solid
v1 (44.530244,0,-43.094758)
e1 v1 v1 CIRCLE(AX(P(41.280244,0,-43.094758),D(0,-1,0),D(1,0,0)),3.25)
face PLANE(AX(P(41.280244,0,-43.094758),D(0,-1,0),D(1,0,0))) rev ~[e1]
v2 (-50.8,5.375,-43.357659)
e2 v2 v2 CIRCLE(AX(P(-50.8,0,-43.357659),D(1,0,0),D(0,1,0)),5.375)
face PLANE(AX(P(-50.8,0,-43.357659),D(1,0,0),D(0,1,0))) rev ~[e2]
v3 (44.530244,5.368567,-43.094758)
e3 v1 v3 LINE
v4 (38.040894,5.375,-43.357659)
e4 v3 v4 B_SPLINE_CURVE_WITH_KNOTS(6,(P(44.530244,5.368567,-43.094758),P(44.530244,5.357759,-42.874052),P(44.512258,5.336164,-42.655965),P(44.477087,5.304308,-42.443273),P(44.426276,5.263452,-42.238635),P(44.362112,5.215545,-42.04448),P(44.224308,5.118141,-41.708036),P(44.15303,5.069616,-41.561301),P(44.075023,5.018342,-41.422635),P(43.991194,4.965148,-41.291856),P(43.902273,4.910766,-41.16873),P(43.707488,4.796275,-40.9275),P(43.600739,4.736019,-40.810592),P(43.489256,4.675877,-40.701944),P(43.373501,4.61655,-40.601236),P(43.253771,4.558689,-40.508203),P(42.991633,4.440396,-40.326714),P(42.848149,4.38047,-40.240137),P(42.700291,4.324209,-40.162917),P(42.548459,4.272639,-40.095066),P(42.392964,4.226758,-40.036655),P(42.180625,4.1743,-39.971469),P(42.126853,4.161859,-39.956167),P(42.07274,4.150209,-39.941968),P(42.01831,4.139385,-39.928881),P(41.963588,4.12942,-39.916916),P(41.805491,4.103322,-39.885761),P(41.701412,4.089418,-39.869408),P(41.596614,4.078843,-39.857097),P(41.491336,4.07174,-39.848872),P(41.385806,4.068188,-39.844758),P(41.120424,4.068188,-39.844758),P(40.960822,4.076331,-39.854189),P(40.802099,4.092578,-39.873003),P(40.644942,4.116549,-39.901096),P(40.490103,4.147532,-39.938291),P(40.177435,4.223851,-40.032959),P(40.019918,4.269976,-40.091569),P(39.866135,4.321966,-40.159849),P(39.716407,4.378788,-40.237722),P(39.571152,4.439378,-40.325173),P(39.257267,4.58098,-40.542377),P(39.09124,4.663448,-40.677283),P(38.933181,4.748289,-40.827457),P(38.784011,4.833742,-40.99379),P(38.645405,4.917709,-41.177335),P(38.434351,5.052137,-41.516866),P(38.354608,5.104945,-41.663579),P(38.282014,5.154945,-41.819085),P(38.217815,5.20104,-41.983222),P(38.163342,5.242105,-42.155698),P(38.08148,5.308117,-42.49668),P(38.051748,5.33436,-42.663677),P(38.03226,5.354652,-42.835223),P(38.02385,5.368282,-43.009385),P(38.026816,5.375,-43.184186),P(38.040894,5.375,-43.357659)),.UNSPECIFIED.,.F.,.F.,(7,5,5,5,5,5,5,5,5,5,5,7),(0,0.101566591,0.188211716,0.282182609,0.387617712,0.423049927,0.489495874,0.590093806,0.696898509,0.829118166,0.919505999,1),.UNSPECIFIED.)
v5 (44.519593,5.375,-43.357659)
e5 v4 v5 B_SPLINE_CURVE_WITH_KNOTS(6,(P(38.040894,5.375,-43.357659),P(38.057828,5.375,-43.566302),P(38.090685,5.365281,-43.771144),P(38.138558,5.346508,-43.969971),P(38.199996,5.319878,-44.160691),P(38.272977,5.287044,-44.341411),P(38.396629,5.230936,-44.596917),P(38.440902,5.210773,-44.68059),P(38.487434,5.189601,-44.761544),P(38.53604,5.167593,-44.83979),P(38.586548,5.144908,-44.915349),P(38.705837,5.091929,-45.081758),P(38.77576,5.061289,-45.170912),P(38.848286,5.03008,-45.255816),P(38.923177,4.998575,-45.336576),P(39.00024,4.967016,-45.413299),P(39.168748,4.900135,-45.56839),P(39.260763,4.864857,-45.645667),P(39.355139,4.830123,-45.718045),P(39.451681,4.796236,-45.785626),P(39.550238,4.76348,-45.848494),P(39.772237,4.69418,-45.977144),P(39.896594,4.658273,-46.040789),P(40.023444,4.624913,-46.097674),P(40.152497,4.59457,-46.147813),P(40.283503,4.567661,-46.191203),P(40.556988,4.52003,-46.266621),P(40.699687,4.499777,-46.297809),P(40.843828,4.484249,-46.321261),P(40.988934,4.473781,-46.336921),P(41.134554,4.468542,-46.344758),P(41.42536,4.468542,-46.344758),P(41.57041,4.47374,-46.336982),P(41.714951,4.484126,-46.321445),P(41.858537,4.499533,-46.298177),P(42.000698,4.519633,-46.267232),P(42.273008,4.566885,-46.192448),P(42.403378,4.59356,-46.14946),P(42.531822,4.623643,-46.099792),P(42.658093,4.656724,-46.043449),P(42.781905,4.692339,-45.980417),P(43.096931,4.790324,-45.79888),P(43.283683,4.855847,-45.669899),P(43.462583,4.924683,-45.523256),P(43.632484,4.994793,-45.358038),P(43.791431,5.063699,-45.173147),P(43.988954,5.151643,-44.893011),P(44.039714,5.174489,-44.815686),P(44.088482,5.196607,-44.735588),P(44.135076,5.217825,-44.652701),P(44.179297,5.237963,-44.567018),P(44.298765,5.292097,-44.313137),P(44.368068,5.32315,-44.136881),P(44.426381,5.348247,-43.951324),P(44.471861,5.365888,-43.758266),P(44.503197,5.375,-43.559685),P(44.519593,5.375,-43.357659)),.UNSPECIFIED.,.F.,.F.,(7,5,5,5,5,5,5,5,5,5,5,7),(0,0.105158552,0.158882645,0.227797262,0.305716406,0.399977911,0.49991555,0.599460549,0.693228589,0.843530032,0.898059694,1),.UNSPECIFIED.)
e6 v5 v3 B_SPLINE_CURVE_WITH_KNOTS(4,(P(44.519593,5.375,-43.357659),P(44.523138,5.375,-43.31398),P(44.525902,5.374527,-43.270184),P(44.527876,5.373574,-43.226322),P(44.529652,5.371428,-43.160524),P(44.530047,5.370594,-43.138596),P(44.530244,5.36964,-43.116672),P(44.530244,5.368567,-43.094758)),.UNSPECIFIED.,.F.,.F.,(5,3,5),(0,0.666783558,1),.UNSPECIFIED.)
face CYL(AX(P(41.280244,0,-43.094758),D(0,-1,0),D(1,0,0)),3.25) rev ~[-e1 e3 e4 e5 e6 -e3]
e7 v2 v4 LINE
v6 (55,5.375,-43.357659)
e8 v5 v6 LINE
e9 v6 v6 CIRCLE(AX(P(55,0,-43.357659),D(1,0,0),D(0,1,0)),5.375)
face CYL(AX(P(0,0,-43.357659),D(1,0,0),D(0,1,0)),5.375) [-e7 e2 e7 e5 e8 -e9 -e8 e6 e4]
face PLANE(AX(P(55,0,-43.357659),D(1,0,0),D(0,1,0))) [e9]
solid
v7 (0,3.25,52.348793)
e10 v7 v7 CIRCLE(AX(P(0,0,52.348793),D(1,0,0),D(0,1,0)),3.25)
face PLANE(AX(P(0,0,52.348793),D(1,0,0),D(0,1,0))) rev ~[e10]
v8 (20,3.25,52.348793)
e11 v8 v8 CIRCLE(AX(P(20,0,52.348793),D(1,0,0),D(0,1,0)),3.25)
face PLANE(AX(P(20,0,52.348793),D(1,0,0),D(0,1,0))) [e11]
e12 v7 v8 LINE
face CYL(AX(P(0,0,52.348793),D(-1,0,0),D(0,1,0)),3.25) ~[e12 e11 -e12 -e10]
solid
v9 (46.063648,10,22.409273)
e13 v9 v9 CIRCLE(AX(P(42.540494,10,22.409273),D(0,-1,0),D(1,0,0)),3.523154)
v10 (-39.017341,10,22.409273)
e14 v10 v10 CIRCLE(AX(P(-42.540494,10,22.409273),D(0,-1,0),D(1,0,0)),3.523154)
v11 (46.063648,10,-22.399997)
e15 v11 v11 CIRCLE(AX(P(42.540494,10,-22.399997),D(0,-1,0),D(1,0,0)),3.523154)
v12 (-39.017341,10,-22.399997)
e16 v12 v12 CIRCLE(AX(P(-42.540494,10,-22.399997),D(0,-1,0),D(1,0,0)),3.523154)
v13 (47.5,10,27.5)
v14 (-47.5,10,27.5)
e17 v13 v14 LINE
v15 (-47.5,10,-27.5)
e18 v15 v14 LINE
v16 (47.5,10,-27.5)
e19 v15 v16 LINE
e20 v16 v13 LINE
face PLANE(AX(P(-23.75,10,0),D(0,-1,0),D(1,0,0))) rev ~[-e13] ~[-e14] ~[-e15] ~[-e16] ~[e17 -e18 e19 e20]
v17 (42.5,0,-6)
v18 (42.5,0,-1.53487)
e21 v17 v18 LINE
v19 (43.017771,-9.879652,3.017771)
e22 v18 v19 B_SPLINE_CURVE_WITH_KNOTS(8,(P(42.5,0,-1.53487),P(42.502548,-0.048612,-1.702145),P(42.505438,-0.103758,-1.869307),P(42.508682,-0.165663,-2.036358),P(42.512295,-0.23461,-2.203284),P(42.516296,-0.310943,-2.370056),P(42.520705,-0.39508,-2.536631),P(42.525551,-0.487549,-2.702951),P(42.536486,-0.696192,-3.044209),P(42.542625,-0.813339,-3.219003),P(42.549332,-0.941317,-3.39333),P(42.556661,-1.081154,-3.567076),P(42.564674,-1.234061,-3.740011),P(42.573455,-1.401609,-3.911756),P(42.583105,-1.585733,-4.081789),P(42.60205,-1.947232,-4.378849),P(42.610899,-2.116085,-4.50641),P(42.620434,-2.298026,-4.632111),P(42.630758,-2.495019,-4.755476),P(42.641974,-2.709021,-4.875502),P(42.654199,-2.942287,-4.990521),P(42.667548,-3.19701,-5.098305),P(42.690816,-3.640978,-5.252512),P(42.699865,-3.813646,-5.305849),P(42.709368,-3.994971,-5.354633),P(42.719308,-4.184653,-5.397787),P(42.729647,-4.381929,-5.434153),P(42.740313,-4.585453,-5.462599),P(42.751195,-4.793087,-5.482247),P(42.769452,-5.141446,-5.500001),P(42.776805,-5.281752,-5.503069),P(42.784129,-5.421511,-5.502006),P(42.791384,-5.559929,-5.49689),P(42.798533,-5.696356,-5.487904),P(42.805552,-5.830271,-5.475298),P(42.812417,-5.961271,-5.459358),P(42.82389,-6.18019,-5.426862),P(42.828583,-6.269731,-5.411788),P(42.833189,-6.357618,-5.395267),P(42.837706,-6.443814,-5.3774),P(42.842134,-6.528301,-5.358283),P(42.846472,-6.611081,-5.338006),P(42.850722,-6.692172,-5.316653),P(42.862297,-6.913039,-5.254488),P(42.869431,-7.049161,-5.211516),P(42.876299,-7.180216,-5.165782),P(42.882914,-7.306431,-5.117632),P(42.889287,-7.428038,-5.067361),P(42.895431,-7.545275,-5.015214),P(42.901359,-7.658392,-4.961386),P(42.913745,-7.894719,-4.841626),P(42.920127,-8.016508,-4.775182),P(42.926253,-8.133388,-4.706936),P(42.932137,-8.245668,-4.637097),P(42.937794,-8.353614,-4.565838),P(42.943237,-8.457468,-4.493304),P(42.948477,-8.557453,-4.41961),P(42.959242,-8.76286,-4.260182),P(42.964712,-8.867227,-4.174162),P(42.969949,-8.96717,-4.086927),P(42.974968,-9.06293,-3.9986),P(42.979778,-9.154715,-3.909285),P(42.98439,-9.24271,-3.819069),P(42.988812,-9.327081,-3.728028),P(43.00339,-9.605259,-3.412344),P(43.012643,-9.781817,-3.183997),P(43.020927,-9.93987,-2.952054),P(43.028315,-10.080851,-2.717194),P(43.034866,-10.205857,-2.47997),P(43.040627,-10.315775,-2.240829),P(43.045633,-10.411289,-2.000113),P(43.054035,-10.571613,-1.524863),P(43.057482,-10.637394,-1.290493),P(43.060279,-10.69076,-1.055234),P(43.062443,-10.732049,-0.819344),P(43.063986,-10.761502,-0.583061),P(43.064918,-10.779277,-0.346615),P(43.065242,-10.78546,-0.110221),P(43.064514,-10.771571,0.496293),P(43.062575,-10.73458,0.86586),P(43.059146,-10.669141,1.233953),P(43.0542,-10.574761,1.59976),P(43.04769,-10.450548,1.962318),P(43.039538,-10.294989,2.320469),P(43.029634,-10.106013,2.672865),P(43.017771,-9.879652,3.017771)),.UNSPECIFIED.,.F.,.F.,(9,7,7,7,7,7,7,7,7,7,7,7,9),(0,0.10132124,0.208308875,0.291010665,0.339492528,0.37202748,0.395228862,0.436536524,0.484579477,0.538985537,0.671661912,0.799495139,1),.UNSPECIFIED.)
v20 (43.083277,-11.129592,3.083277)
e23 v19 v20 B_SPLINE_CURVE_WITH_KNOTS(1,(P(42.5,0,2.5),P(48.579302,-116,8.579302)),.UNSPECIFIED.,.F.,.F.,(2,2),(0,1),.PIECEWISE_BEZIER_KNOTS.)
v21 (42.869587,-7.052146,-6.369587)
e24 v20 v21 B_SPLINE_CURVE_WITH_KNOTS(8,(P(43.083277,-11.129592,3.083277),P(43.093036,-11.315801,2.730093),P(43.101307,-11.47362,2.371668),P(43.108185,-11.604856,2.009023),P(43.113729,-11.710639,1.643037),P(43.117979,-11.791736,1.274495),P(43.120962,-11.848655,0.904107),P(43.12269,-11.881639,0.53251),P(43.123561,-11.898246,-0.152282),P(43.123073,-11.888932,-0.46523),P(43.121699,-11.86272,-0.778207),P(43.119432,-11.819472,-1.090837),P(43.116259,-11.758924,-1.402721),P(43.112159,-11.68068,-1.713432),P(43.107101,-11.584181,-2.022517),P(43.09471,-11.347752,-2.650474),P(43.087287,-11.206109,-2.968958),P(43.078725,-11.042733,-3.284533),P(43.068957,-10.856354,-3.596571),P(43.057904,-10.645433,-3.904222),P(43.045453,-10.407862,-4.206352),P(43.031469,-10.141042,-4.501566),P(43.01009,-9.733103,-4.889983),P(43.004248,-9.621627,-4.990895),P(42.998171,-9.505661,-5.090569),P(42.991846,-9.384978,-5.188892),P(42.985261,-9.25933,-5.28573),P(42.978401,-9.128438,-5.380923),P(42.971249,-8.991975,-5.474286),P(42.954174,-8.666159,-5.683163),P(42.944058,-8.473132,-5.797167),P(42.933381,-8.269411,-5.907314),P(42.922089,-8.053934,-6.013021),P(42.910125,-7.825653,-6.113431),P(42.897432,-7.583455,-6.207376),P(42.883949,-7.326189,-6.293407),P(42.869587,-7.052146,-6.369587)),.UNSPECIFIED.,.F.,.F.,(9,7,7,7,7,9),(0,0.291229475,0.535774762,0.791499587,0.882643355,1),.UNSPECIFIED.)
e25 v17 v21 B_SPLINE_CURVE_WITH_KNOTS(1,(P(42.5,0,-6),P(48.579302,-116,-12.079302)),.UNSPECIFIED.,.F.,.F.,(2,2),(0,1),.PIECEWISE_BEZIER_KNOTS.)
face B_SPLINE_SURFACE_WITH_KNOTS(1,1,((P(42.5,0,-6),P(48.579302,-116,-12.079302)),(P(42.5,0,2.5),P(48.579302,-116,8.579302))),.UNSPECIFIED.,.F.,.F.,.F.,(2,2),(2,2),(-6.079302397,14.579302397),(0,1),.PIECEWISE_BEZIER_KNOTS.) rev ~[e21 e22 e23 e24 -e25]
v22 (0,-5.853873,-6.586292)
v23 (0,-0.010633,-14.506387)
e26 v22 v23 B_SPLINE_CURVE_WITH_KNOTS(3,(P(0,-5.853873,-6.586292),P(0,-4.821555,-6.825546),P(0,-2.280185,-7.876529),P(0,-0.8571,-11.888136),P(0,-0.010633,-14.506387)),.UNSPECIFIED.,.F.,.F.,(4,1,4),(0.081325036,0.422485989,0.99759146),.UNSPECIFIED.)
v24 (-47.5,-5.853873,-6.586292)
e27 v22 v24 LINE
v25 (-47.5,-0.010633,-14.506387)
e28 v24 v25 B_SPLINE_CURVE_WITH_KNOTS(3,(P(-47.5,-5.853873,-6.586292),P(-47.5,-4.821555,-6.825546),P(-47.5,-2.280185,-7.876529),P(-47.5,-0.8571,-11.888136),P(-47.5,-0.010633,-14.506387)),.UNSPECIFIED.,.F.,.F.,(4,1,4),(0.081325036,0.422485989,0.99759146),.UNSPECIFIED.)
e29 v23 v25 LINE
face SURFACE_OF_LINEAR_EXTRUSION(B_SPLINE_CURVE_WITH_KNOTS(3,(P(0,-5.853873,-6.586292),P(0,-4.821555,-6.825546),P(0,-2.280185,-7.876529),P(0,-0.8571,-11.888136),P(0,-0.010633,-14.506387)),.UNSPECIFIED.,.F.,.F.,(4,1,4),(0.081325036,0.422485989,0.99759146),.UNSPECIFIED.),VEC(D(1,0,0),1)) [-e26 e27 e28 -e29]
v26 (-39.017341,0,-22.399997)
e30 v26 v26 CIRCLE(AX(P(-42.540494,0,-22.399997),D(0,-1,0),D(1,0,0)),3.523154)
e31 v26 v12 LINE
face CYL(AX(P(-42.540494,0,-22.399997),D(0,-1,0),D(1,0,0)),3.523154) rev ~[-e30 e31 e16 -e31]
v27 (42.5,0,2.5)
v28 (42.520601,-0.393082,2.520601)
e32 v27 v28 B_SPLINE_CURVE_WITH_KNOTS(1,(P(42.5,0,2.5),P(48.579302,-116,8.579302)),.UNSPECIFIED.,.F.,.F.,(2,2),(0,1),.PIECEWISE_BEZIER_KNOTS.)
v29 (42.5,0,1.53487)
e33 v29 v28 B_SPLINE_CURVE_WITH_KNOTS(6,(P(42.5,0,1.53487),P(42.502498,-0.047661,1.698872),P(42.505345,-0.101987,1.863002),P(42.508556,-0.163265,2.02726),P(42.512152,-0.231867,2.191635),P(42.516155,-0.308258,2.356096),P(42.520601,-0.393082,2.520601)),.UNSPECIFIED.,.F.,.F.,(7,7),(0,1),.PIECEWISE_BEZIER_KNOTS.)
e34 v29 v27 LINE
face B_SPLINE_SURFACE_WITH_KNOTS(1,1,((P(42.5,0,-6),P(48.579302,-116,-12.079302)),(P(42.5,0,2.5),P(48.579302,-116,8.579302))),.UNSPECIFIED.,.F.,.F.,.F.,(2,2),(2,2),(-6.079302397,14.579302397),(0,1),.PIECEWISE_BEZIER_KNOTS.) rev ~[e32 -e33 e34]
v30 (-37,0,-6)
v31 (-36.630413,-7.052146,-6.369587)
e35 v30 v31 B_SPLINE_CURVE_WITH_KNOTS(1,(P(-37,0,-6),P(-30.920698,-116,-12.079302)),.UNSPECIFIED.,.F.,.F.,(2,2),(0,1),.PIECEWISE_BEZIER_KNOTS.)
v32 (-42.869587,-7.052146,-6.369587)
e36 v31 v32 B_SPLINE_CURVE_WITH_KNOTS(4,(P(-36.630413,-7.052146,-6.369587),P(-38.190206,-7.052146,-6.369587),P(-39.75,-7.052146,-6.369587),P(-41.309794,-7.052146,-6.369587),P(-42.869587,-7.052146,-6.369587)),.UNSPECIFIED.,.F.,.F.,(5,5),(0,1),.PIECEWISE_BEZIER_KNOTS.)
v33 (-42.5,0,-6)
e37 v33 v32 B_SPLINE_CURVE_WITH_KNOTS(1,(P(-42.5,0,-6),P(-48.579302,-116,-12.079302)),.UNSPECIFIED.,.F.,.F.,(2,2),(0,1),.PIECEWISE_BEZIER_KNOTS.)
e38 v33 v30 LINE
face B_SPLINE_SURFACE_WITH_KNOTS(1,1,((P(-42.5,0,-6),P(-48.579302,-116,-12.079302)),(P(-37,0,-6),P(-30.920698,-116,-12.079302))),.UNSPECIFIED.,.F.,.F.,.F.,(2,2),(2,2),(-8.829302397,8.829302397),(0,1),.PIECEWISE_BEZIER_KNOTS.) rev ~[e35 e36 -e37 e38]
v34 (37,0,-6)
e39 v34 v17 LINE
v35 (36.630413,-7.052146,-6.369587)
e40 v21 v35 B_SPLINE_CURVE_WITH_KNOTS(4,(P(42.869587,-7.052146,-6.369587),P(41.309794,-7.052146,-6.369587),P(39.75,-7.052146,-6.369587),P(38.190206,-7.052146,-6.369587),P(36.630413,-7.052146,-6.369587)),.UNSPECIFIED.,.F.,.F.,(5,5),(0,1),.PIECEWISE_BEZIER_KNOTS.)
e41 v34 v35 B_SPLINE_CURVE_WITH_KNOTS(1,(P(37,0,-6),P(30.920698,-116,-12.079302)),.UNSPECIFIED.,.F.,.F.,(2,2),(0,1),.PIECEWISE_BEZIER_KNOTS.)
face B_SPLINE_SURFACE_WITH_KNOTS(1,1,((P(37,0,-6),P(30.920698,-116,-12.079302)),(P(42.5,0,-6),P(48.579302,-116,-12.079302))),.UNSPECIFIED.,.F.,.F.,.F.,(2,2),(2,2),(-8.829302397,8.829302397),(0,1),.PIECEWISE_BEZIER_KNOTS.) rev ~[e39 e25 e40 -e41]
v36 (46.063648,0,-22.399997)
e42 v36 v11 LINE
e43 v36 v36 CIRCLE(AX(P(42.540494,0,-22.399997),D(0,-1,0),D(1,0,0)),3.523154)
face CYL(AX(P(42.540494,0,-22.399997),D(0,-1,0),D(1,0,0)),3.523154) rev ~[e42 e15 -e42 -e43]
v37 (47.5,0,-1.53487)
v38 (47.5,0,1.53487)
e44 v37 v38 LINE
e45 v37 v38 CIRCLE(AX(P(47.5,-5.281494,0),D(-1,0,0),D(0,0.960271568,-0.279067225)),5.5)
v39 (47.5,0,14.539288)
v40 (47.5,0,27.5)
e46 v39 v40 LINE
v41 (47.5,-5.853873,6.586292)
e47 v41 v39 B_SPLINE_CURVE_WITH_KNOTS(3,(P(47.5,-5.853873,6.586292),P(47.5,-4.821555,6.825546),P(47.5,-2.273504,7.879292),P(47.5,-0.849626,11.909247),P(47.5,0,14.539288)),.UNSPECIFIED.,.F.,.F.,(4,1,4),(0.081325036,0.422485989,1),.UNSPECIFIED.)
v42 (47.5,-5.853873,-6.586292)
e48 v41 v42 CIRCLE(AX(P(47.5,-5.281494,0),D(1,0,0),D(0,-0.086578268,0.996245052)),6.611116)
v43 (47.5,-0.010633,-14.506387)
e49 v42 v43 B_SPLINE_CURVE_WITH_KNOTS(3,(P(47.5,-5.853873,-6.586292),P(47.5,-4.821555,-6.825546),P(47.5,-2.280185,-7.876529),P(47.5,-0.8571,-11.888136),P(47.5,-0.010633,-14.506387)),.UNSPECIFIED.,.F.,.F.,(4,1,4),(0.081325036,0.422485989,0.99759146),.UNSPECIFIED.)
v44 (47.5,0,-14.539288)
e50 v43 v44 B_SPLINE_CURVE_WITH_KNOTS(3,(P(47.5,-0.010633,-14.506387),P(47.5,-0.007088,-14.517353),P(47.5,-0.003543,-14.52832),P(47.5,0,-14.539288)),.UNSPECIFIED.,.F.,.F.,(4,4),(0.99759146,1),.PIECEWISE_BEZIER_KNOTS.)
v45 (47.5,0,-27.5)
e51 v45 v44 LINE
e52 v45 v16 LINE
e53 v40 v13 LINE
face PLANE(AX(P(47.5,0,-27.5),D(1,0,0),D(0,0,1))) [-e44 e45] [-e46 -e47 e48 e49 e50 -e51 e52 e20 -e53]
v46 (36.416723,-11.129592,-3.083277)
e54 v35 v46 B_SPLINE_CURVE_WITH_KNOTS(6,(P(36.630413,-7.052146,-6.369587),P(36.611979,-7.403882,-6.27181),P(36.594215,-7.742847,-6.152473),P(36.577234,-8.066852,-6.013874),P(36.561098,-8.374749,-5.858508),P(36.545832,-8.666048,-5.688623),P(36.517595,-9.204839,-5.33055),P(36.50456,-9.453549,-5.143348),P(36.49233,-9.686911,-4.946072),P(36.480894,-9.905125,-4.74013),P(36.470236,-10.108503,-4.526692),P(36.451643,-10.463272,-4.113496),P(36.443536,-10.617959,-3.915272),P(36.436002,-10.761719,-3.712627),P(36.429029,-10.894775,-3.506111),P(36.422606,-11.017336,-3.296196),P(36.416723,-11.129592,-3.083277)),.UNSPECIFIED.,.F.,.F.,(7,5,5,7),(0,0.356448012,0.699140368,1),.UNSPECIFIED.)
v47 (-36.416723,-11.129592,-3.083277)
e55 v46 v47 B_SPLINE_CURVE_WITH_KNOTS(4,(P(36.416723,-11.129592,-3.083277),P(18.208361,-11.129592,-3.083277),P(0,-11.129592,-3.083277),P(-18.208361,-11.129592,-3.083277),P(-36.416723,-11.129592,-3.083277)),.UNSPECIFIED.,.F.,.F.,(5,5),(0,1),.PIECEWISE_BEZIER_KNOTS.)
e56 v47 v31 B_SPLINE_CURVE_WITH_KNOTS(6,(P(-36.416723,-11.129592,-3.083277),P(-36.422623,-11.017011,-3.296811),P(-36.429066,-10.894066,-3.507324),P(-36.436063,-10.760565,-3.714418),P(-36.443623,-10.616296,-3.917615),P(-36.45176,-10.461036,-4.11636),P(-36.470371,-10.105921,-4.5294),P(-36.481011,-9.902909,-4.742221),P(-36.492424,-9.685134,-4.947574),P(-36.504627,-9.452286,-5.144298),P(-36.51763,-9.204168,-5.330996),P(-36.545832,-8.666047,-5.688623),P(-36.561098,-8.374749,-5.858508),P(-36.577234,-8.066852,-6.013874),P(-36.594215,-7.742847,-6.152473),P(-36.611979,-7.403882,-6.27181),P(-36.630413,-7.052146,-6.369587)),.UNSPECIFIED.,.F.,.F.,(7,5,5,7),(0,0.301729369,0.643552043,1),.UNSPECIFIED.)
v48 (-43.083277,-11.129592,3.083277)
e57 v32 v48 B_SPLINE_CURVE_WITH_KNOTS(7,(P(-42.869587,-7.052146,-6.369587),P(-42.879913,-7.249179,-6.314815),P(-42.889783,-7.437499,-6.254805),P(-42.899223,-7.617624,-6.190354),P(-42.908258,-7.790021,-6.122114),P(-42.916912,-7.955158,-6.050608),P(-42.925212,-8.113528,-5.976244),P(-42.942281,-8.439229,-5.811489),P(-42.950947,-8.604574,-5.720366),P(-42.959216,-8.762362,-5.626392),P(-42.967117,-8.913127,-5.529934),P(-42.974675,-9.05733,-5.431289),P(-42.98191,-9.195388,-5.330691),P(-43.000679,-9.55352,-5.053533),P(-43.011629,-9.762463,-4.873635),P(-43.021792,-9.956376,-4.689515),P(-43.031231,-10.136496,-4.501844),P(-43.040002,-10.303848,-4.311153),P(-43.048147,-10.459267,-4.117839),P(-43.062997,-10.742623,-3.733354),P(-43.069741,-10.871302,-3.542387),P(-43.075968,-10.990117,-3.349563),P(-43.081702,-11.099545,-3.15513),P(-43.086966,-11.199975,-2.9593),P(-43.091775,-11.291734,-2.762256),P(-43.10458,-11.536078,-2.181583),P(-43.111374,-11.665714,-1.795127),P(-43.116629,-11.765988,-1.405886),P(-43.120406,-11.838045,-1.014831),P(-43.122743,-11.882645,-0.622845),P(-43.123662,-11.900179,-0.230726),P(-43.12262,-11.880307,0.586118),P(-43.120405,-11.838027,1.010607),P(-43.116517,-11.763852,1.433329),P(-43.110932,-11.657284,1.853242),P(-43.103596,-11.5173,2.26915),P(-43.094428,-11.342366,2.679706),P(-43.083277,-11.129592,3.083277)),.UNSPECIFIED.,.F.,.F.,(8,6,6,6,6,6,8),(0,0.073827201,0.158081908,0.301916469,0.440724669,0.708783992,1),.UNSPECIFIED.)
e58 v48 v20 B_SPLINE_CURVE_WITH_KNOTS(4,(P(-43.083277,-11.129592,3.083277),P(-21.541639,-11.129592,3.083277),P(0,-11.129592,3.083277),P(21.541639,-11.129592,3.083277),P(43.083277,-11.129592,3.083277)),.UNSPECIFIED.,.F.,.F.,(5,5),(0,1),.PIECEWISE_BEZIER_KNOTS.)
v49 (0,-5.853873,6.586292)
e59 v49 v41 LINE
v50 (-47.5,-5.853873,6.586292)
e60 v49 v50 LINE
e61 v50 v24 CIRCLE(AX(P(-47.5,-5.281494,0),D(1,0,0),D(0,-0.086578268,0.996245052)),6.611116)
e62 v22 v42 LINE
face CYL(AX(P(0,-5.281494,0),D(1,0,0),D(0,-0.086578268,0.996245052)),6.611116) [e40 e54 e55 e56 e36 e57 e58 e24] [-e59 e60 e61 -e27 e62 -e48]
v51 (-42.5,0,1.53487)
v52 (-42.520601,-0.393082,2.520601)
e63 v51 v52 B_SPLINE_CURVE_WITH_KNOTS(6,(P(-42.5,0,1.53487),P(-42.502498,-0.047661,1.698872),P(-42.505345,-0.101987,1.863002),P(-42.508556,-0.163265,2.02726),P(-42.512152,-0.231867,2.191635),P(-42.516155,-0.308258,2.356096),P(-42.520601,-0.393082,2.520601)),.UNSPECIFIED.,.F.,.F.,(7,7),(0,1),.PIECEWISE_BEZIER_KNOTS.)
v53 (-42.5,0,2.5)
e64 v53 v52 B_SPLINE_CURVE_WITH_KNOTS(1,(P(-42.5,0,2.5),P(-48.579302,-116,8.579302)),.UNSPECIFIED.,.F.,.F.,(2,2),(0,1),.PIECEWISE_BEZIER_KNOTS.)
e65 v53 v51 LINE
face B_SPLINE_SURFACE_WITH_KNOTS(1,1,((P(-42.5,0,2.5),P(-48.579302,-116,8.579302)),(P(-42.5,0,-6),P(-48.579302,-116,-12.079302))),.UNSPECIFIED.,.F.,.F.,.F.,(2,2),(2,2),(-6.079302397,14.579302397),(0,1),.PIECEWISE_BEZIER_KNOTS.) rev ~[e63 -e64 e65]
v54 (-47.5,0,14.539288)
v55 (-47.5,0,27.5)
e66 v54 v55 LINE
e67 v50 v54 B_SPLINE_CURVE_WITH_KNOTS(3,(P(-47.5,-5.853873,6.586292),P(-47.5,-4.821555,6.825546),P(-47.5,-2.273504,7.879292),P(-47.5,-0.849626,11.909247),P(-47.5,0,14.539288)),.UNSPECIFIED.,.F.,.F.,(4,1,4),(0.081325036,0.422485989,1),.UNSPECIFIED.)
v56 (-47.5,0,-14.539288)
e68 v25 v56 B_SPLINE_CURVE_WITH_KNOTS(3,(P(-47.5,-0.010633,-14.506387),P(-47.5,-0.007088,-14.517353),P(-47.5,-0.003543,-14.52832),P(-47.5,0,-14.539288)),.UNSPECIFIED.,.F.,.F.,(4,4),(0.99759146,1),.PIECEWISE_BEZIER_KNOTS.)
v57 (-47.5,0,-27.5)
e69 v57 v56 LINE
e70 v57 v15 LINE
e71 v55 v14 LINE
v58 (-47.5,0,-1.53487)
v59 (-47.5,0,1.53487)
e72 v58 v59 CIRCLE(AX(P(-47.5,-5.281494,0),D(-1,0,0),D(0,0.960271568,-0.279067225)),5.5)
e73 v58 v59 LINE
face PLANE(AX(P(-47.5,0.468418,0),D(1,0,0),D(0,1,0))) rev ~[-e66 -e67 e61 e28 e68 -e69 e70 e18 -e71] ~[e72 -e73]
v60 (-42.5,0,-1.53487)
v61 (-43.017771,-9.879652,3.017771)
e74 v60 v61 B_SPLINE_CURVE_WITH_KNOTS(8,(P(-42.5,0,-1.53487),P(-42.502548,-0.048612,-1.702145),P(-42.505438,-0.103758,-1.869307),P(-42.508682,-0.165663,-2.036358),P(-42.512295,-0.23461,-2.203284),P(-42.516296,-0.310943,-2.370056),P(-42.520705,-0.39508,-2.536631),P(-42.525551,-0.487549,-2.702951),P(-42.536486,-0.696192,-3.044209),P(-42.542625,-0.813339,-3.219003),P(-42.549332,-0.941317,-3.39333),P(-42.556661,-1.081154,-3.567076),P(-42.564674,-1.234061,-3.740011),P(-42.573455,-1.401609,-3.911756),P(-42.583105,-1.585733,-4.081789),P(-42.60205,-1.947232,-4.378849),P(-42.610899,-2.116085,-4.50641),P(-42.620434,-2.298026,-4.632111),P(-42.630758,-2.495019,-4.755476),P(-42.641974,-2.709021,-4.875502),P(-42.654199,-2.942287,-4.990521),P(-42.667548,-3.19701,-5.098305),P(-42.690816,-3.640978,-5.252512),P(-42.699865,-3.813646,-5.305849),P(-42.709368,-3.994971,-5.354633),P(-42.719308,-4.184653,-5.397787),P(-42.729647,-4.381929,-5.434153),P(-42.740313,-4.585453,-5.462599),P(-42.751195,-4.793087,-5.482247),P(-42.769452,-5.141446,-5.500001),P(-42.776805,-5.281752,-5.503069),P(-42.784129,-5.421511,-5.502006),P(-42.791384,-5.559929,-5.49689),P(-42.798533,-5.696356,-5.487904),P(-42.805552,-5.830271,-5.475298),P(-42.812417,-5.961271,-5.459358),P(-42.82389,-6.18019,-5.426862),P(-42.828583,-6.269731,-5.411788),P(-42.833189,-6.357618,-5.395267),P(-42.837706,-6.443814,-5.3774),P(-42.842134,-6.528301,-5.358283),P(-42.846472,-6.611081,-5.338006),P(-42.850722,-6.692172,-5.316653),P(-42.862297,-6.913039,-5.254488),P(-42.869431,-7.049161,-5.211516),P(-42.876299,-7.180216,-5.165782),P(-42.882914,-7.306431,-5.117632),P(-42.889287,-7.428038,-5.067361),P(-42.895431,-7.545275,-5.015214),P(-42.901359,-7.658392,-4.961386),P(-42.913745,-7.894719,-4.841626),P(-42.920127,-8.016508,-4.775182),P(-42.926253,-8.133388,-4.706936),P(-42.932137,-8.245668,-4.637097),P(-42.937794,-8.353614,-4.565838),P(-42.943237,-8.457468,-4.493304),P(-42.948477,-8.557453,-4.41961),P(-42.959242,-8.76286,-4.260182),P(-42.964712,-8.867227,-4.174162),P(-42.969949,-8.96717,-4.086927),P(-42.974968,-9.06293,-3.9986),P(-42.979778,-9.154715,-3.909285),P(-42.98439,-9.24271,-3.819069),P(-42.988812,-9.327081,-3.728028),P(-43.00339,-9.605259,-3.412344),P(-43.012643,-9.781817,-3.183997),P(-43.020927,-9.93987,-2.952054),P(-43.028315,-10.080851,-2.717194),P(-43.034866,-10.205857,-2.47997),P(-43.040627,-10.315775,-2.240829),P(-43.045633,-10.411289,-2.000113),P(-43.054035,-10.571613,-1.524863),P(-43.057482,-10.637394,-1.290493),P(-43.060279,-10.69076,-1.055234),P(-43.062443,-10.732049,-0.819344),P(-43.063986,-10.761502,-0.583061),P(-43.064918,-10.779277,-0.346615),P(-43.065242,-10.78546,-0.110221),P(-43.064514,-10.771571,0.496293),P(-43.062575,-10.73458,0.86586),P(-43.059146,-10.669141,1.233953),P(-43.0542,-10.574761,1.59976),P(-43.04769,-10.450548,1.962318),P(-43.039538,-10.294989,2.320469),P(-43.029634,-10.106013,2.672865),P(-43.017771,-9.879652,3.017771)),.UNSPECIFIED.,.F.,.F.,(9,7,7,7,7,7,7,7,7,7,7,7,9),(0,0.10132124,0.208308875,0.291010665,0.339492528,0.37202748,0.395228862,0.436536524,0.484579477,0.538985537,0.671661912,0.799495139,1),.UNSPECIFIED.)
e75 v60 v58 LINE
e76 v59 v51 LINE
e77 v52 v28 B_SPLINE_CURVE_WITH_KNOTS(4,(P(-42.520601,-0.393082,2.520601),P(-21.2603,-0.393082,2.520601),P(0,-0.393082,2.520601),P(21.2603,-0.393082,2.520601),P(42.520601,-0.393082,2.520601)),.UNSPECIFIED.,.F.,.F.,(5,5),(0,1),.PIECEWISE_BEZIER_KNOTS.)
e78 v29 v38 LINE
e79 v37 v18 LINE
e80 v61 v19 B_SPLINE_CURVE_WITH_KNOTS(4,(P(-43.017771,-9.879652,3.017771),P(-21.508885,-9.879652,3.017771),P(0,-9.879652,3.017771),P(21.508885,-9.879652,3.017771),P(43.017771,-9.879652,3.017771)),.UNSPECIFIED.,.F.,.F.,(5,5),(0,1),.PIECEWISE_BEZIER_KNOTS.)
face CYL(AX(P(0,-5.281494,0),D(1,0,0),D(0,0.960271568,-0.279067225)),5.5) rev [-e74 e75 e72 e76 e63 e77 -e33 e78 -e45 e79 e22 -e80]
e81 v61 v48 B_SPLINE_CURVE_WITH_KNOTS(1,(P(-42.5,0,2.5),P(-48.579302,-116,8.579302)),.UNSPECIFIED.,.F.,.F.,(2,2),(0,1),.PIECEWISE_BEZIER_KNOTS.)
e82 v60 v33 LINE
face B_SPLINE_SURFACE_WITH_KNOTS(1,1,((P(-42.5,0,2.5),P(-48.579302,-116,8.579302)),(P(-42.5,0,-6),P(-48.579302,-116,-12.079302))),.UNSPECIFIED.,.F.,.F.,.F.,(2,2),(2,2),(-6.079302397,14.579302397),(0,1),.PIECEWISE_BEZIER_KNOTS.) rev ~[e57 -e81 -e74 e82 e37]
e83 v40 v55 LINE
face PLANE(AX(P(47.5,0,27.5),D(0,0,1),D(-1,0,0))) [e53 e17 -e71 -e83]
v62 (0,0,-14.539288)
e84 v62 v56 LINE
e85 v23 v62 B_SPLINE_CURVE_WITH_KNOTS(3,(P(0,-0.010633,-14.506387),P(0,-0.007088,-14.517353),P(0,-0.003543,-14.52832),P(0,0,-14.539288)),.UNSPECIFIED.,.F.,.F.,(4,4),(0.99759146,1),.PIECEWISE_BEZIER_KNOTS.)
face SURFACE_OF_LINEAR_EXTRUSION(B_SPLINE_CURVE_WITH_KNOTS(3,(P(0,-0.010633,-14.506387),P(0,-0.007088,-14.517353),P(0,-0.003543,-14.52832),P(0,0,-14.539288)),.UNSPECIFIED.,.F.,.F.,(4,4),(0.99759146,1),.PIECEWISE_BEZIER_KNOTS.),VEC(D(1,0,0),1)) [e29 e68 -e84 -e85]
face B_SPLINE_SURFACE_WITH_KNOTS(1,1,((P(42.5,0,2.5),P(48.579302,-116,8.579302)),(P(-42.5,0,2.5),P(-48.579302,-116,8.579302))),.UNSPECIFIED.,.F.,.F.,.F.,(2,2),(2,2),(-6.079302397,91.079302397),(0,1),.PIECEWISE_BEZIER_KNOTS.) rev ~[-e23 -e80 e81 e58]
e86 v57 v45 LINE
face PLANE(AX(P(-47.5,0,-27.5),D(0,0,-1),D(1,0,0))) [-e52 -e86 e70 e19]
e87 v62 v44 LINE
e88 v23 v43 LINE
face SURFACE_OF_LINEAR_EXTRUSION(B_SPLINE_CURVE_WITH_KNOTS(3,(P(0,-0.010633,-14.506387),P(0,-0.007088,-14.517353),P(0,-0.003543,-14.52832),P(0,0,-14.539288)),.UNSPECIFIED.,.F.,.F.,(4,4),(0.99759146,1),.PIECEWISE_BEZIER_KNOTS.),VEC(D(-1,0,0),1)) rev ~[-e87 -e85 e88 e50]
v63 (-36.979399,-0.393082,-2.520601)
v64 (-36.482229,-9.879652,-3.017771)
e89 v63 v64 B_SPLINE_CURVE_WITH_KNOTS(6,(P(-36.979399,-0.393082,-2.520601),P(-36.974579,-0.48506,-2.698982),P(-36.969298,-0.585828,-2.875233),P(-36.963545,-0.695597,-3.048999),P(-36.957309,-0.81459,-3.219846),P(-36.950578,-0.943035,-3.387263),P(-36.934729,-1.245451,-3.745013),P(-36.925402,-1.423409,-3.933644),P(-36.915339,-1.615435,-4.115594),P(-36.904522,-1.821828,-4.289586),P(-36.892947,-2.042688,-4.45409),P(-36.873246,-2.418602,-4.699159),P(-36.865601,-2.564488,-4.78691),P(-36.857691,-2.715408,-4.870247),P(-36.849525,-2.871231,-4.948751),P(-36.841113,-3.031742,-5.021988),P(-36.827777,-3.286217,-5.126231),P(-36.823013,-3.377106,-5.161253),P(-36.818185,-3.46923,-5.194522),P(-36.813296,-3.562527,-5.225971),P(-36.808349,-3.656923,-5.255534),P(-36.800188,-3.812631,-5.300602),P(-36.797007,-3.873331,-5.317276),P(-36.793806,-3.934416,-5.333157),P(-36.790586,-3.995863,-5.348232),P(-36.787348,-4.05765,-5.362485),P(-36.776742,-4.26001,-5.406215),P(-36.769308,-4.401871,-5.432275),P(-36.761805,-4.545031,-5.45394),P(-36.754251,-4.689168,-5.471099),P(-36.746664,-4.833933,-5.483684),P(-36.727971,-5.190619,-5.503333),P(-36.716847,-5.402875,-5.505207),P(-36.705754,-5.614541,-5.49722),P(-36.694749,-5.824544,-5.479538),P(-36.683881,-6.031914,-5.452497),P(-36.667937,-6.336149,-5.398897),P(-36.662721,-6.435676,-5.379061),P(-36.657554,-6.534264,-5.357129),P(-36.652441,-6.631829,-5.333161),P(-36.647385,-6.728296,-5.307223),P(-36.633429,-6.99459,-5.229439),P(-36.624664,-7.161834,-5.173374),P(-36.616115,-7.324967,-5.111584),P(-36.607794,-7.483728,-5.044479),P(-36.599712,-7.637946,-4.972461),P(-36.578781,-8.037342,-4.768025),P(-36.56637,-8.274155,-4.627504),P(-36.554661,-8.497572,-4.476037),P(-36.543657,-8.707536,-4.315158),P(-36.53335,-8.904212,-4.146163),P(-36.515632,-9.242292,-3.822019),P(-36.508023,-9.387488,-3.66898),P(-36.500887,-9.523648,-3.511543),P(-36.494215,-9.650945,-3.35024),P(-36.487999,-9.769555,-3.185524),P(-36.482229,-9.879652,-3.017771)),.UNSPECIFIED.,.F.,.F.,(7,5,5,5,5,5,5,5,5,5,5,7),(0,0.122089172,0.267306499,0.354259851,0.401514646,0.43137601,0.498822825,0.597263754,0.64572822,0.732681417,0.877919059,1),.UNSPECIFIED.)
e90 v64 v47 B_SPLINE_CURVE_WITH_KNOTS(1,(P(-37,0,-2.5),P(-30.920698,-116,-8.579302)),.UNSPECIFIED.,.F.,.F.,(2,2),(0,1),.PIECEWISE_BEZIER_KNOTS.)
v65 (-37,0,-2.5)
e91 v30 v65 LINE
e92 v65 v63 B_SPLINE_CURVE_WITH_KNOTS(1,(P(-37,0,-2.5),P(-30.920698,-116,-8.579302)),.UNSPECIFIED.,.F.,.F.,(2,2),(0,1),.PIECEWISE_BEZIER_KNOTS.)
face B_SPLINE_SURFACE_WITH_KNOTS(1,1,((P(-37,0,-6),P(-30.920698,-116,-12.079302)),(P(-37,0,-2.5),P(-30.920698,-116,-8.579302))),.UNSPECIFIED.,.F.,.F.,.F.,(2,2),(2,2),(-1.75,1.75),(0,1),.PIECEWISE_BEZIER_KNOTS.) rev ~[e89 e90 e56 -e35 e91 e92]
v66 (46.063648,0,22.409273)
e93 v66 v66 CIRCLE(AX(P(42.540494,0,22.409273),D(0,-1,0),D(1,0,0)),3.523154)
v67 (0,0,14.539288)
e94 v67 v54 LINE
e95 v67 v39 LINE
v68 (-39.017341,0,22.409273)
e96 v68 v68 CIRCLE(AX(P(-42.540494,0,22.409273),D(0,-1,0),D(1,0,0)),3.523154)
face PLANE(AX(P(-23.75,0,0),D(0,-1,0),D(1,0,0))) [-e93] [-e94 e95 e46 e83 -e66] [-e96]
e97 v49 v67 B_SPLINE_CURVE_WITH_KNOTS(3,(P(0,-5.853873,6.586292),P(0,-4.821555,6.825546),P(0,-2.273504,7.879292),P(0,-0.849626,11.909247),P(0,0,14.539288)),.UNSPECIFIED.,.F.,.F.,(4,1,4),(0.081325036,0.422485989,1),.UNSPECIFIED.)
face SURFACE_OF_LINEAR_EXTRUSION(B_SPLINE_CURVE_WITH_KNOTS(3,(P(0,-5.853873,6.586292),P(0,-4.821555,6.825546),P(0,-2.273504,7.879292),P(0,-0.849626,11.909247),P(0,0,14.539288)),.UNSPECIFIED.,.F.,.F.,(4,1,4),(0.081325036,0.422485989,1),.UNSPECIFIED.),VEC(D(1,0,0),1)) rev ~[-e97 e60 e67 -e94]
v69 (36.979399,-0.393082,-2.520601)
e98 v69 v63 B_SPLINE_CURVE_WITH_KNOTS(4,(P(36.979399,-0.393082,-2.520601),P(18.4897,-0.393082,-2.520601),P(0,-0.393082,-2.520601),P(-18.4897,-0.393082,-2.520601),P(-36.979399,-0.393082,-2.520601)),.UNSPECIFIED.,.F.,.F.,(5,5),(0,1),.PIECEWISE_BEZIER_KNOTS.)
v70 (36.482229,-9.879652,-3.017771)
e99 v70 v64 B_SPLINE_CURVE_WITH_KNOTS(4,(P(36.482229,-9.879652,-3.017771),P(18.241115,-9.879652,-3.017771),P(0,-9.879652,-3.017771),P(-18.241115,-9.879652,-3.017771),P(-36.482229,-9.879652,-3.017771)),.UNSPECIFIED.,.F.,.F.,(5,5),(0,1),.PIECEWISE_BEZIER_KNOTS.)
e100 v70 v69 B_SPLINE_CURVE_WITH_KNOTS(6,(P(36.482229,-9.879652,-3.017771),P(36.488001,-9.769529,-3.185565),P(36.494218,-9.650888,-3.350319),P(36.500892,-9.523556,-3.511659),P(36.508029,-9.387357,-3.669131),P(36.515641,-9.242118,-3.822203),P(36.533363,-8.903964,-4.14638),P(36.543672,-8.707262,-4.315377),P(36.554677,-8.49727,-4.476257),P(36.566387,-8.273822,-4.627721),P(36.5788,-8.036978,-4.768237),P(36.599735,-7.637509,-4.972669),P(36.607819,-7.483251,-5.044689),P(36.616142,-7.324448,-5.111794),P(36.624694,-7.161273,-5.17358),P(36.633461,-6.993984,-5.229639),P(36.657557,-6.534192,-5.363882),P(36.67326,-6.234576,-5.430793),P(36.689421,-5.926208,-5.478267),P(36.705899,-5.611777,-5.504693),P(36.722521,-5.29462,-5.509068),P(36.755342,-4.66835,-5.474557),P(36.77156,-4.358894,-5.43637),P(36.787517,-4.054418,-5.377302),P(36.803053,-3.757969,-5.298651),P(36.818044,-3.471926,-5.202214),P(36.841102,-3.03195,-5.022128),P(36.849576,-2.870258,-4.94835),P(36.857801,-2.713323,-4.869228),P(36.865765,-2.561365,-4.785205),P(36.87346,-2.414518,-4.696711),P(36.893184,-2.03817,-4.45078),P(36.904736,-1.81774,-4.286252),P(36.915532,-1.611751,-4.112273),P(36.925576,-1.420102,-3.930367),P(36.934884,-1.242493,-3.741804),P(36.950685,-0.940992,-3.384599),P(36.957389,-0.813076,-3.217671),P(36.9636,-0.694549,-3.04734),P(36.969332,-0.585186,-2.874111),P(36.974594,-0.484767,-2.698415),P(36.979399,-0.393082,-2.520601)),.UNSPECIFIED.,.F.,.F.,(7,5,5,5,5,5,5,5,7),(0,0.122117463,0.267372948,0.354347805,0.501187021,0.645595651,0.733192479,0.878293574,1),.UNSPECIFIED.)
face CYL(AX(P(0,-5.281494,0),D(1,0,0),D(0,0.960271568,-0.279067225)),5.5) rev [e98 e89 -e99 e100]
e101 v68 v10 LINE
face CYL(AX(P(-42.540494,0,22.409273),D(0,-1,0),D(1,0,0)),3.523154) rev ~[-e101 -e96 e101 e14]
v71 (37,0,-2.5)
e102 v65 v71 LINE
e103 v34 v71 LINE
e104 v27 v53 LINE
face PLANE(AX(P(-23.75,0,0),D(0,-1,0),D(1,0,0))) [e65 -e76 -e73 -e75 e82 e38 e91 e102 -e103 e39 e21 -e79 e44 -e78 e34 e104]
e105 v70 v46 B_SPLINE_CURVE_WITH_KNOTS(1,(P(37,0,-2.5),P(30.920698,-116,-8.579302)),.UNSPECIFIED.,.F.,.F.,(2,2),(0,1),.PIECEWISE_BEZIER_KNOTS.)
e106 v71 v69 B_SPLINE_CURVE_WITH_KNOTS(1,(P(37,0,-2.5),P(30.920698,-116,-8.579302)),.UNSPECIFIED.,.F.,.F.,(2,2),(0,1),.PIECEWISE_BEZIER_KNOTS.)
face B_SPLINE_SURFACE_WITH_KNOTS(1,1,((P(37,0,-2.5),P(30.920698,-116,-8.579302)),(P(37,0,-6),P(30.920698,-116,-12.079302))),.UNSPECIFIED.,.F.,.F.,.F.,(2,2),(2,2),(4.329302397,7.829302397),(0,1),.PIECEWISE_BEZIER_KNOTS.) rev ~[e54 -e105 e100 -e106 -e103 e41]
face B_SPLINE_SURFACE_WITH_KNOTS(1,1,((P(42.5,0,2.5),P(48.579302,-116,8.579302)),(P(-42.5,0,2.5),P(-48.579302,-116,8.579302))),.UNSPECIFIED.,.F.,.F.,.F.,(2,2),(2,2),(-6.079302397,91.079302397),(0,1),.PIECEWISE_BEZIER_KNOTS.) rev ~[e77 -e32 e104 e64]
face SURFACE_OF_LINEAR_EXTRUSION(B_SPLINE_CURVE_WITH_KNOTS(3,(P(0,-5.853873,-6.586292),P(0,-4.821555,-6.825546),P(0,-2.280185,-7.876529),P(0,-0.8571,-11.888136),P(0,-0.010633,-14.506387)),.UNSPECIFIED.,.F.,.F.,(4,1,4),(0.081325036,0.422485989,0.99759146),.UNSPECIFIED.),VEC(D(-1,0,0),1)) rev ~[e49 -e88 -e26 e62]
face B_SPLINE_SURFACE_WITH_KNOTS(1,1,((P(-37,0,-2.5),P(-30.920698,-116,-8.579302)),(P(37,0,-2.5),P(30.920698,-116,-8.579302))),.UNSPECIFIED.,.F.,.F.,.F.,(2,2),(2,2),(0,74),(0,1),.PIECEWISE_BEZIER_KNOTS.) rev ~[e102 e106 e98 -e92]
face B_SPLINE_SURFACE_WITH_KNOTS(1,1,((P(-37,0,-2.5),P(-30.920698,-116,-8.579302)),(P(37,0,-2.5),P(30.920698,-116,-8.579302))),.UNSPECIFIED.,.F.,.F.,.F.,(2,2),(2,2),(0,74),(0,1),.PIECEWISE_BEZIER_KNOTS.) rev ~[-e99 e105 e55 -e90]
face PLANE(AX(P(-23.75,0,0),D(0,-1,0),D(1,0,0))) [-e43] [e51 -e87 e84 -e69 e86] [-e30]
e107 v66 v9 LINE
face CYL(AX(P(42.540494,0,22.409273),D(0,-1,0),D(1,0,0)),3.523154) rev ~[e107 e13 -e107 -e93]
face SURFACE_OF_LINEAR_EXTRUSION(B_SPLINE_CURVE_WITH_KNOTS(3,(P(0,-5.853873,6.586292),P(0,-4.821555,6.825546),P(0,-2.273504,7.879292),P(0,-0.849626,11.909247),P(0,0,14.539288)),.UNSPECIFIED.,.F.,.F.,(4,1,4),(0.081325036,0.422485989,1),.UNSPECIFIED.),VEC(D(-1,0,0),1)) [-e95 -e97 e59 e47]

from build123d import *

# Parameters (mm, degrees)
F0_W      = 47.5
F0_H      = 55
F0_R      = 3.5231538004
F2_DEPTH  = 10
F3_DEPTH  = 47.5
F4_DEPTH  = 47.5
F5_W      = 5.5
F5_H      = 3.5
F6_DEPTH  = 116
F6_TAPER  = -3
F7_R      = 5.375
F8_DEPTH  = 55
F9_DEPTH  = 50.8
F10_R     = 3.25
F11_DEPTH = 25
F12_R     = 3.25
F13_DEPTH = 20


# Not quite as in the source:
# - an extrude ends at something that could not be found from the text; its depth is read off the source's solid


with BuildPart() as f2:
    # F0 (on Front) → F2 (new body)
    with BuildSketch(Plane.XZ):
        with Locations((-23.75, 0)):
            Rectangle(F0_W, F0_H)
        with Locations((-42.5404943526, -22.3999973387)):
            Circle(F0_R, mode=Mode.SUBTRACT)
        with Locations((-42.5404943526, 22.4092733115)):
            Circle(F0_R, mode=Mode.SUBTRACT)
        with Locations((23.75, 0)):
            Rectangle(F0_W, F0_H)
        with Locations((42.5404943526, -22.3999973387)):
            Circle(F0_R, mode=Mode.SUBTRACT)
        with Locations((42.5404943526, 22.4092733115)):
            Circle(F0_R, mode=Mode.SUBTRACT)
    extrude(amount=-F2_DEPTH)

    # F1 (on Right) → F3 (join)
    with BuildSketch(Plane.YZ):
        with BuildLine():
            ThreePointArc((0, -3.9765159025), (0.9884114859, -2.0964597633), (1.32962229, 0))
            ThreePointArc((1.32962229, 0), (0.9884114859, 2.0964597633), (0, 3.9765159025))
            Line((0, 3.9765159025), (0, 1.5348697397))
            ThreePointArc((0, 1.5348697397), (0.1636057764, 0.7751725864), (0.2185063777, 0))
            ThreePointArc((0.2185063777, 0), (0.1636057764, -0.7751725864), (0, -1.5348697397))
            Line((0, -1.5348697397), (0, -3.9765159025))
        make_face()
        with BuildLine():
            Line((0, -14.5392882731), (0, -14.5063873886))
            Line((0, -14.5063873886), (-0.0106325767, -14.5063873886))
            add(Edge.make_bspline(
                [(-0.0106325767, -14.5063873886), (-0.0070875742, -14.5173526167), (-0.0035433916, -14.5283196043), (0, -14.5392882731)],
                knots=[0.9975914602, 0.9975914602, 0.9975914602, 0.9975914602, 1, 1, 1, 1], degree=3))
        make_face()
        with BuildLine():
            Line((0, -14.5063873886), (0, -3.9765159025))
            ThreePointArc((0, -3.9765159025), (-2.5895292088, -6.0382266604), (-5.8538725864, -6.5862915155))
            add(Edge.make_bspline(
                [(-5.8538725864, -6.5862915155), (-4.8215552648, -6.8255458917), (-2.2801846921, -7.8765294876), (-0.8570999414, -11.8881360206), (-0.0106325767, -14.5063873886)],
                knots=[0.0813250355, 0.0813250355, 0.0813250355, 0.0813250355, 0.4224859886, 0.9975914602, 0.9975914602, 0.9975914602, 0.9975914602], degree=3))
            Line((-0.0106325767, -14.5063873886), (0, -14.5063873886))
        make_face()
        with BuildLine():
            Line((0, 1.5348697397), (0, 3.9765159025))
            ThreePointArc((0, 3.9765159025), (-2.5895292088, 6.0382266604), (-5.8538725864, 6.5862915155))
            ThreePointArc((-5.8538725864, 6.5862915155), (-11.8926095346, 0), (-5.8538725864, -6.5862915155))
            ThreePointArc((-5.8538725864, -6.5862915155), (-2.5895292088, -6.0382266604), (0, -3.9765159025))
            Line((0, -3.9765159025), (0, -1.5348697397))
            ThreePointArc((0, -1.5348697397), (-10.7814936223, 0), (0, 1.5348697397))
        make_face()
        with BuildLine():
            ThreePointArc((-5.8538725864, 6.5862915155), (-2.5895292088, 6.0382266604), (0, 3.9765159025))
            Line((0, 3.9765159025), (0, 14.5392882731))
            add(Edge.make_bspline(
                [(-5.8538725864, 6.5862915155), (-4.8215552648, 6.8255458917), (-2.2735043292, 7.8792921512), (-0.8496260973, 11.9092466626), (0, 14.5392882731)],
                knots=[0.0813250355, 0.0813250355, 0.0813250355, 0.0813250355, 0.4224859886, 1, 1, 1, 1], degree=3))
        make_face()
    extrude(amount=F3_DEPTH)

    # F4 (add): a face of the model
    f4_faces = [f2.faces().sort_by_distance(p)[0] for p in [
        (0, -0.31416521, -8.0370790064),
    ]]
    extrude(f4_faces, amount=F4_DEPTH)

    # F5 (on Front) → F6 (cut, through all)
    with BuildSketch(Plane.XZ):
        with Locations((-39.75, -4.25)):
            Rectangle(F5_W, F5_H)
        with Locations((39.75, -4.25)):
            Rectangle(F5_W, F5_H)
        Polygon((37, -2.5), (42.5, -2.5), (42.5, 2.5), (-42.5, 2.5), (-42.5, -2.5), (-37, -2.5), align=None)
    extrude(amount=F6_DEPTH, taper=F6_TAPER, mode=Mode.SUBTRACT)


with BuildPart() as f8:
    # F7 (on Right) → F8 (new body)
    with BuildSketch(Plane.YZ):
        with Locations((0, -43.3576591313)):
            Circle(F7_R)
    extrude(amount=F8_DEPTH)

    # F9 (add): a face of the model
    f9_faces = [f8.faces().sort_by_distance(p)[0] for p in [
        (0, 0, -43.3576591313),
    ]]
    extrude(f9_faces, amount=F9_DEPTH)

    # F10 (on Front) → F11 (cut)
    with BuildSketch(Plane.XZ):
        with Locations((41.2802435458, -43.0947579443)):
            Circle(F10_R)
    extrude(amount=-F11_DEPTH, mode=Mode.SUBTRACT)


with BuildPart() as f13:
    # F12 (on Right) → F13 (new body)
    with BuildSketch(Plane.YZ):
        with Locations((0, 52.3487925529)):
            Circle(F12_R)
    extrude(amount=F13_DEPTH)


solid = Compound([f2.part, f8.part, f13.part])
